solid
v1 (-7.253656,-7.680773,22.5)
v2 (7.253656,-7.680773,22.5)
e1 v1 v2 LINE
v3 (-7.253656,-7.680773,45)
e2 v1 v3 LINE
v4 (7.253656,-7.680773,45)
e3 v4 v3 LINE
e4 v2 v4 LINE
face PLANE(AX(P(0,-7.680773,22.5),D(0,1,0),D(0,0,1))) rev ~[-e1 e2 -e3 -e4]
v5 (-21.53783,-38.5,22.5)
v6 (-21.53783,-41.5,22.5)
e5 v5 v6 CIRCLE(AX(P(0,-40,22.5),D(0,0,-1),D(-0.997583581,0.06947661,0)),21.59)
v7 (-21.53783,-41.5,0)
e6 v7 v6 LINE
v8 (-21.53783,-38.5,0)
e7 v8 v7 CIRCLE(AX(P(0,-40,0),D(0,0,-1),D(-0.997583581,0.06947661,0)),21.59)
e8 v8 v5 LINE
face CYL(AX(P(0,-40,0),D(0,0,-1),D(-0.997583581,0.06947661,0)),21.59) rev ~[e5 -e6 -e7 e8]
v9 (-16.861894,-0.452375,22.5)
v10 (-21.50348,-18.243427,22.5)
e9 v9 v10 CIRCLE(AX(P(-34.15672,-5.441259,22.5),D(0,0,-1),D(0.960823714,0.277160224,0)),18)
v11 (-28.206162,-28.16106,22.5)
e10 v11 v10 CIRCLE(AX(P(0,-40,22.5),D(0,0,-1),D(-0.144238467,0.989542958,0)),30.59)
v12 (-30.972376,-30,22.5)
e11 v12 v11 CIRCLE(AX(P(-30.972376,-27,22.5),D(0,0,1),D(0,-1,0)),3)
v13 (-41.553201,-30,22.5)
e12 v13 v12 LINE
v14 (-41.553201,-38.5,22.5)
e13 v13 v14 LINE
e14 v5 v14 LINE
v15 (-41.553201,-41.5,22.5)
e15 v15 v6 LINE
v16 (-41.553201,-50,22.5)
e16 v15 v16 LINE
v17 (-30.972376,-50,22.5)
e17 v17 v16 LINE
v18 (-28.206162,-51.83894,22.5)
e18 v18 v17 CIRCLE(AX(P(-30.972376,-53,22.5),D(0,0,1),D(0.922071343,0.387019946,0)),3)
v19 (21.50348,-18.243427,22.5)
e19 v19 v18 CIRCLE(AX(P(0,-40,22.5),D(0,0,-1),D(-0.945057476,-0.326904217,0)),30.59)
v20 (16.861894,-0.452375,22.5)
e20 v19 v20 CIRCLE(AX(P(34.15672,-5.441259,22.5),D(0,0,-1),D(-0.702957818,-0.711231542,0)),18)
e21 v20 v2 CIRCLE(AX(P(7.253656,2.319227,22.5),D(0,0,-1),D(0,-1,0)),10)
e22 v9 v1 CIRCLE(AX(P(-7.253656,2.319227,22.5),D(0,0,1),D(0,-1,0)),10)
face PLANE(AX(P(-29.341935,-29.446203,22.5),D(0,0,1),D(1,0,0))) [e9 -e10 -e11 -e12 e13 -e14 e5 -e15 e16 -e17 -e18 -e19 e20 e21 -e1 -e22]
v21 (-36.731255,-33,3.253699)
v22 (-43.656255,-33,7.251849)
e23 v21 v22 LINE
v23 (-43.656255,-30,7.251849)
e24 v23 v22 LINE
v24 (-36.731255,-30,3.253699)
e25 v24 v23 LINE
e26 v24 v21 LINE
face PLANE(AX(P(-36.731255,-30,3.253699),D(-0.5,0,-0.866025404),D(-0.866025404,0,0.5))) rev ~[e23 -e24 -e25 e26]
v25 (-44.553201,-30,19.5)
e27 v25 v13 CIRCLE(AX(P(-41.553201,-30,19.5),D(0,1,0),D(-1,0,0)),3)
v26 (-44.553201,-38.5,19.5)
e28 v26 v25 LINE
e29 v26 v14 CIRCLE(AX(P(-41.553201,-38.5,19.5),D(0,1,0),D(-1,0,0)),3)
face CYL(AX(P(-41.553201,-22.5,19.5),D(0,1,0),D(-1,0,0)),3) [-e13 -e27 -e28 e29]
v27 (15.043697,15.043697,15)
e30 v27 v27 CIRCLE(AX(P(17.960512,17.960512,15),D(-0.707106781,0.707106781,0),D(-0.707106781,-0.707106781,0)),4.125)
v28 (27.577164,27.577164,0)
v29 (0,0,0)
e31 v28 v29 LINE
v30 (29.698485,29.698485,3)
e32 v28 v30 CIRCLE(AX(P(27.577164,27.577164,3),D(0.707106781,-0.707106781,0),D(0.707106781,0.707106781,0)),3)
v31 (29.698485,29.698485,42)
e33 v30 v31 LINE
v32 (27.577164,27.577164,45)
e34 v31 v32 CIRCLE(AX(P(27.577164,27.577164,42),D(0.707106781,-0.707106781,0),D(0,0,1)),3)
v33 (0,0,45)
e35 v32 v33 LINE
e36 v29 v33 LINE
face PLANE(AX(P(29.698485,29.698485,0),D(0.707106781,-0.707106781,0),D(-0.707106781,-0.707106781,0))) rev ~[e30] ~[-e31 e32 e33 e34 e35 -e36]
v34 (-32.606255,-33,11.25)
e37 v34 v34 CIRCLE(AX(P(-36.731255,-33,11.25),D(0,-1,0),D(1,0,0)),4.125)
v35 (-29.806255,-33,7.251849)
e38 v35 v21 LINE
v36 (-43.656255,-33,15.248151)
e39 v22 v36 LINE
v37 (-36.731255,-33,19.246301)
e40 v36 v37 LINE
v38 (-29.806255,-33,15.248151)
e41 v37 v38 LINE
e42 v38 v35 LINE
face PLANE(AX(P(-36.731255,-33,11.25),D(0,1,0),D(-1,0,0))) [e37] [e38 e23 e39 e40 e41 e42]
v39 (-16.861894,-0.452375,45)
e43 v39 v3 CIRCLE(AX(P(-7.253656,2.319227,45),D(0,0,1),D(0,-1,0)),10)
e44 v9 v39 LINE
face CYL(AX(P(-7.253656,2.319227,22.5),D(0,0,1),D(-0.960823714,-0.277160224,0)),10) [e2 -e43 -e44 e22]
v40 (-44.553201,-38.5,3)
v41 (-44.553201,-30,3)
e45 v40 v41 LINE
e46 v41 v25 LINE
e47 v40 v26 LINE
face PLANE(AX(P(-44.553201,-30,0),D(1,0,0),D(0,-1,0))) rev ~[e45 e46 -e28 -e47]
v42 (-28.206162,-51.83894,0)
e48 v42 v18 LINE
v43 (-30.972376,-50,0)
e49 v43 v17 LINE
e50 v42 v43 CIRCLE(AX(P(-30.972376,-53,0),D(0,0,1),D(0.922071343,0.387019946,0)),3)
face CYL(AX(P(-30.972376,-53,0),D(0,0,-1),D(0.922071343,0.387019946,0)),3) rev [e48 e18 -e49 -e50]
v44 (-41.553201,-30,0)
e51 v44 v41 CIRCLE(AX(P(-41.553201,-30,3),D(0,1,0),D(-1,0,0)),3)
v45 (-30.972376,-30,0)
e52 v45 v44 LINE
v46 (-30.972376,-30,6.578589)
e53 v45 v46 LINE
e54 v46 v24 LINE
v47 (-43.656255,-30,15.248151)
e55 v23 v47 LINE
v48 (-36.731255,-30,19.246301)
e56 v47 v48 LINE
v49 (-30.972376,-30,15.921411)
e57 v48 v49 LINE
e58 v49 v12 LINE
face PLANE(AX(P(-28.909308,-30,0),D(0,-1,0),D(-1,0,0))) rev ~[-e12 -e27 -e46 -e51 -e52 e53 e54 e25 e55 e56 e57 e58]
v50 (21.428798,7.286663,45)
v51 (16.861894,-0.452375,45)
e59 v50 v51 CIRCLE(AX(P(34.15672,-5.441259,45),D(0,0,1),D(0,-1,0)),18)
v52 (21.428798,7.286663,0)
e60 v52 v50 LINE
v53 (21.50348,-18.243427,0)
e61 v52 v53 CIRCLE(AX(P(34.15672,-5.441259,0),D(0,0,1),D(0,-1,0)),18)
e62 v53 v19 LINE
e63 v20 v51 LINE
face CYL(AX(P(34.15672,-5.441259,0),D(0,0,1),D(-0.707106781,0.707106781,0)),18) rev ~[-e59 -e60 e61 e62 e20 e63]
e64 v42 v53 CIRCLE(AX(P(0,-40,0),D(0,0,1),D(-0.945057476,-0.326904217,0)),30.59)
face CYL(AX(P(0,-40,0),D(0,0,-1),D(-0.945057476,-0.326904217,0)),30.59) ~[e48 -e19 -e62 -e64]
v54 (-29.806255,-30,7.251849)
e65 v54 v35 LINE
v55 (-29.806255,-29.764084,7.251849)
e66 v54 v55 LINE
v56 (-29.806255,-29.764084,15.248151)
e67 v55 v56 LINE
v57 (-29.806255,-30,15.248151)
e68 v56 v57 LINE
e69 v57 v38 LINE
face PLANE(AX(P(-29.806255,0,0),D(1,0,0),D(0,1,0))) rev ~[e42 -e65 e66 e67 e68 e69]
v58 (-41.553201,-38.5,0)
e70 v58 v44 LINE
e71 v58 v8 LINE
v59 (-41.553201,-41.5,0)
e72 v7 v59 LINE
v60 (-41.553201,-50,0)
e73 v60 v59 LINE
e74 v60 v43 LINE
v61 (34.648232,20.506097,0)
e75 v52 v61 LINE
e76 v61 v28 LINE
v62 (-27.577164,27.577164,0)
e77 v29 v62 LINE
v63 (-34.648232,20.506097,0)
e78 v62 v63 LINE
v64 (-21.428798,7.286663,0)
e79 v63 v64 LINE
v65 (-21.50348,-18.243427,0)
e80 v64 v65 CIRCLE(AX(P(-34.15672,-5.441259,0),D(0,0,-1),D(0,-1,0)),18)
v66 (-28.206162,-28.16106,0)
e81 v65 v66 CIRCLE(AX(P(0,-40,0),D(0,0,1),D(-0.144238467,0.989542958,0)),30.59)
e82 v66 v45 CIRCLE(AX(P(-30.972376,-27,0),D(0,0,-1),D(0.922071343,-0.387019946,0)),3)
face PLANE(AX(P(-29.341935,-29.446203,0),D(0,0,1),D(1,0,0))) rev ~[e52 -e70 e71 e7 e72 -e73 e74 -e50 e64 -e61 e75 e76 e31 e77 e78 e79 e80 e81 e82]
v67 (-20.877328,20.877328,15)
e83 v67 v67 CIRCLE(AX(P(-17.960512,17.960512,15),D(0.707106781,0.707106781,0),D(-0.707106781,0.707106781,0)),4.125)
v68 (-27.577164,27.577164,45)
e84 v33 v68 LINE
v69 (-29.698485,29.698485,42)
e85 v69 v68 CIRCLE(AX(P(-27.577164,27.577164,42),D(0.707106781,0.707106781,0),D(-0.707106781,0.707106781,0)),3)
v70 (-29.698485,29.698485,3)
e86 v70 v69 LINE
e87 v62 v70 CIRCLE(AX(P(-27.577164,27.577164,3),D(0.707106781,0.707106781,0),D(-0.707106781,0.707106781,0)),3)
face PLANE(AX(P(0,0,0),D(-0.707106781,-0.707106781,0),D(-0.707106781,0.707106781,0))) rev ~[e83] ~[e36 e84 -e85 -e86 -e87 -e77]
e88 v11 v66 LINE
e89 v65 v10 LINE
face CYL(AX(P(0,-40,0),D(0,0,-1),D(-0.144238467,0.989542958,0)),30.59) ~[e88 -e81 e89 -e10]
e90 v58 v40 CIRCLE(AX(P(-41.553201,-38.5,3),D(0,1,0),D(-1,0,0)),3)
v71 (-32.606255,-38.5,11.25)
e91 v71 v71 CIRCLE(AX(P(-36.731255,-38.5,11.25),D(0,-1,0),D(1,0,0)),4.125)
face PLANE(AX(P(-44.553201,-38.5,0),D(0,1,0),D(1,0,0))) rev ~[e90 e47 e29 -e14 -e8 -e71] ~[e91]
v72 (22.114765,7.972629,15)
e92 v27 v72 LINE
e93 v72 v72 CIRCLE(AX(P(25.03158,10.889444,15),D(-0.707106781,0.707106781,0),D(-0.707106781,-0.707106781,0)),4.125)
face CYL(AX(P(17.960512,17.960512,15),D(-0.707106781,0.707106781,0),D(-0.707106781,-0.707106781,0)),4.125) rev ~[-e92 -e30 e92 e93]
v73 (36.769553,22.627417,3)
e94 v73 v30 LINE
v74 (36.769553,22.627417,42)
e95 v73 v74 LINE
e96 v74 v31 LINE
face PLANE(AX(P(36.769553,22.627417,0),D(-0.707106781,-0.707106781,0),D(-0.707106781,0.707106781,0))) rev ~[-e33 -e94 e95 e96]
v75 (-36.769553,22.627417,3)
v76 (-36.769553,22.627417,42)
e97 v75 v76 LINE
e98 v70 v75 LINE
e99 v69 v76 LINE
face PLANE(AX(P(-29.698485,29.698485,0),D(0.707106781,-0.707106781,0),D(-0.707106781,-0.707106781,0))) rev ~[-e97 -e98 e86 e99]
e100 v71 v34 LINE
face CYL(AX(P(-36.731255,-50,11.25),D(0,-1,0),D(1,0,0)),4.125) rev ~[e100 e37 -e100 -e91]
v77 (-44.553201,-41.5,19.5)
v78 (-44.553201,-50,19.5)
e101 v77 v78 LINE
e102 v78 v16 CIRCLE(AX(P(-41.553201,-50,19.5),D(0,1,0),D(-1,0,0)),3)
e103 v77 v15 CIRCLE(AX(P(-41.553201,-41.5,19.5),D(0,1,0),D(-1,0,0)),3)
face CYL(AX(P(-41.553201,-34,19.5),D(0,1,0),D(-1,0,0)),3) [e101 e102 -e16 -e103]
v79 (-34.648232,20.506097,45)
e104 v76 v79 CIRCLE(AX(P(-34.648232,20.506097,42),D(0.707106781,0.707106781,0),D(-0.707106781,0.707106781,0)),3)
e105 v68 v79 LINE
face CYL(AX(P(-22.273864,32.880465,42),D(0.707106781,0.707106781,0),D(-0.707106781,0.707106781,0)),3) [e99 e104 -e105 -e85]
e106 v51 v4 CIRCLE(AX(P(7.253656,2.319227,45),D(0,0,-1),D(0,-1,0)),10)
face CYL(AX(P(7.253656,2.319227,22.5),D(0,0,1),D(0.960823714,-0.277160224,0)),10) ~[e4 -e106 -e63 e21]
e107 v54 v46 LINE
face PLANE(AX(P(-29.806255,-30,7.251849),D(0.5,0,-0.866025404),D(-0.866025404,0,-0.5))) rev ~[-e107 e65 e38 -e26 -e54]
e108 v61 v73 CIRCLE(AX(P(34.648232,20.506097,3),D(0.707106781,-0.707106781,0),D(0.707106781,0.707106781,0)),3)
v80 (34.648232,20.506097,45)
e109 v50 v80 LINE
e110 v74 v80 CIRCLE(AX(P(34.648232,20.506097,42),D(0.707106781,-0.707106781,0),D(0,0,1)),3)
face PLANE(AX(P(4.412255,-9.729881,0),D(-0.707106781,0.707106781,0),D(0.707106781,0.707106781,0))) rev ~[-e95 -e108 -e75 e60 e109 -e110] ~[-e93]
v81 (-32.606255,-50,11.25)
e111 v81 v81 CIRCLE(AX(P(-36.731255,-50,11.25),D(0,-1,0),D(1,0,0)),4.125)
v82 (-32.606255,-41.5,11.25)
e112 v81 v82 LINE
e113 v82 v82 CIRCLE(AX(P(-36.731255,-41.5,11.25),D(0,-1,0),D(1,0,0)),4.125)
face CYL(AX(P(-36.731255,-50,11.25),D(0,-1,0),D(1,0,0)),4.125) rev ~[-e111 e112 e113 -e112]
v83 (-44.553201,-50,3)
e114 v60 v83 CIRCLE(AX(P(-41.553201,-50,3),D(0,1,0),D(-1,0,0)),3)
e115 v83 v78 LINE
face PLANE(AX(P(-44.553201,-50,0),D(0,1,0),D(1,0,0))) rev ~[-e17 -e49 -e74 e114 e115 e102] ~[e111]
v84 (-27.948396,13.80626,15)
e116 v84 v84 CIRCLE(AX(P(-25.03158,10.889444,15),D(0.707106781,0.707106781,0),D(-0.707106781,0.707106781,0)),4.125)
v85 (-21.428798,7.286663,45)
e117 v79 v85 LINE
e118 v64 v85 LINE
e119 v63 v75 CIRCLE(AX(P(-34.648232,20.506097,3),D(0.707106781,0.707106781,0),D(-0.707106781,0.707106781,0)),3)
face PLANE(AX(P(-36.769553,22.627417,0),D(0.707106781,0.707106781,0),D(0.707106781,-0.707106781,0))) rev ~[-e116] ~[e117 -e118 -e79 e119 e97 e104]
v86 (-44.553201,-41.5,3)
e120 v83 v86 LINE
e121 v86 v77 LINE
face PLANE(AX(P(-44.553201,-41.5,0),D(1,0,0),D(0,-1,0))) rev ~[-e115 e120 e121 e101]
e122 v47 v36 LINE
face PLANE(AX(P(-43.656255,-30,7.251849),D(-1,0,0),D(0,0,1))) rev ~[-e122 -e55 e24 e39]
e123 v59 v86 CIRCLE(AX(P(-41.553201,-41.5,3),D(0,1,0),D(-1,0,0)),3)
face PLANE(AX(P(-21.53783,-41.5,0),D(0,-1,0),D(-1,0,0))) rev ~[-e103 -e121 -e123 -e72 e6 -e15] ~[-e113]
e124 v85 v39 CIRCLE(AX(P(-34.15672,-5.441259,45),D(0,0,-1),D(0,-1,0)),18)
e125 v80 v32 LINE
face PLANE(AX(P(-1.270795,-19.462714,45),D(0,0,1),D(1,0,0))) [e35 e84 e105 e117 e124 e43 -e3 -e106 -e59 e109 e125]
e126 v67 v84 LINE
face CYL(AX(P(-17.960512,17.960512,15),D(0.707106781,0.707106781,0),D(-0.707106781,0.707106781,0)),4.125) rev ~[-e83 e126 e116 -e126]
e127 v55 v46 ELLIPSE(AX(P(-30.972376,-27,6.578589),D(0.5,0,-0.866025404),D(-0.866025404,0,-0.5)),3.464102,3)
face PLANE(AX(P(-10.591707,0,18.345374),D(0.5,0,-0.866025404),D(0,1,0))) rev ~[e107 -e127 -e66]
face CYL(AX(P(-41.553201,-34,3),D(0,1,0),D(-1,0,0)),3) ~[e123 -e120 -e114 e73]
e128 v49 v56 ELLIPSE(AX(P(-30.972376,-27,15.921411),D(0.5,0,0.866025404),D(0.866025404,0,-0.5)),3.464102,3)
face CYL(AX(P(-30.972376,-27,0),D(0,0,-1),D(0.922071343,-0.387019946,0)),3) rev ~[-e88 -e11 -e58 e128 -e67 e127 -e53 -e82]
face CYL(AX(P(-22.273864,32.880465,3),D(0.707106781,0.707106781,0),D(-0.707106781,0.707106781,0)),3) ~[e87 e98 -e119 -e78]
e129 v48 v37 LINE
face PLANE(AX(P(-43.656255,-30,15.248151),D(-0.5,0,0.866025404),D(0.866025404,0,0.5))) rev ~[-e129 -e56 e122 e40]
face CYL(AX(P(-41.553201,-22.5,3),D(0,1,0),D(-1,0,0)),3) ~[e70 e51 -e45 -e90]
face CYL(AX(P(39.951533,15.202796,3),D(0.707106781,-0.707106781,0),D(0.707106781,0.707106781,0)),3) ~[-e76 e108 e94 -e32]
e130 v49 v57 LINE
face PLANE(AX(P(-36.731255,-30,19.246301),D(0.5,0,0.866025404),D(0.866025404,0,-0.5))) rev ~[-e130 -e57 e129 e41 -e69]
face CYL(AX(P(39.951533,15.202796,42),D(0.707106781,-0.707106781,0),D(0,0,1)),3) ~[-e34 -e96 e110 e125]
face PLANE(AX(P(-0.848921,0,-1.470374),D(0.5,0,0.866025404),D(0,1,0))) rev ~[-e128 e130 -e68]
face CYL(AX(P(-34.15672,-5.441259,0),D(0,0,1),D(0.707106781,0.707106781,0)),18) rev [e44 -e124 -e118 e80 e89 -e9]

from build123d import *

# Parameters (mm, degrees)
F1_DEPTH      = 45
F2_R          = 4.125
F3_DEPTH      = 10
F4_R          = 4.125
F5_DEPTH      = 10
F6_R          = 4.125
F7_DEPTH      = 20
F9_DEPTH      = 3
F10_R         = 18
F11_W         = 72.4435358676
F11_H         = 36.0539390085
F12_DEPTH     = 100
F13_T1_DEPTH  = 22.5
F13_T6_DEPTH  = 22.5
F13_T12_DEPTH = 22.5
F13_T18_DEPTH = 22.5
F13_T25_DEPTH = 22.5
F13_T31_DEPTH = 22.5
F13_T34_DEPTH = 23.5
F13_T36_DEPTH = 23.5
F13_T38_DEPTH = 25
F13_T40_DEPTH = 25
F14_R         = 10


# Not quite as in the source:
# - a fillet or chamfer that OpenCascade refuses, or shapes differently, is made with other operations: its cross-section is extruded or revolved along the edge and cut away or added


with BuildPart() as f1:
    # F0 (on Top) → F1 (new body)
    with BuildSketch(Plane.XY):
        with BuildLine():
            Line((29.6984848098, 29.6984848098), (0, 0))
            Line((0, 0), (-29.6984848098, 29.6984848098))
            Line((-29.6984848098, 29.6984848098), (-36.7695526217, 22.627416998))
            Line((-36.7695526217, 22.627416998), (-4.4122546938, -9.7298809299))
            ThreePointArc((-4.4122546938, -9.7298809299), (-19.5013094439, -16.4320762481), (-28.9093081896, -30))
            ThreePointArc((-28.9093081896, -30), (-30.0334813831, -34.1915496034), (-30.5532011416, -38.5))
            Line((-30.5532011416, -38.5), (-21.53782951, -38.5))
            ThreePointArc((-21.53782951, -38.5), (21.59, -40), (-21.53782951, -41.5))
            Line((-21.53782951, -41.5), (-30.5532011416, -41.5))
            ThreePointArc((-30.5532011416, -41.5), (-30.0334813831, -45.8084503966), (-28.9093081896, -50))
            ThreePointArc((-28.9093081896, -50), (23.5679237519, -59.5013094439), (4.4122546938, -9.7298809299))
            Line((4.4122546938, -9.7298809299), (36.7695526217, 22.627416998))
            Line((36.7695526217, 22.627416998), (29.6984848098, 29.6984848098))
        make_face()
        with BuildLine():
            ThreePointArc((-30.5532011416, -38.5), (-30.0334813831, -34.1915496034), (-28.9093081896, -30))
            Line((-28.9093081896, -30), (-44.5532011416, -30))
            Line((-44.5532011416, -30), (-44.5532011416, -38.5))
            Line((-44.5532011416, -38.5), (-30.5532011416, -38.5))
        make_face()
        with BuildLine():
            Line((-44.5532011416, -50), (-28.9093081896, -50))
            ThreePointArc((-28.9093081896, -50), (-30.0334813831, -45.8084503966), (-30.5532011416, -41.5))
            Line((-30.5532011416, -41.5), (-44.5532011416, -41.5))
            Line((-44.5532011416, -41.5), (-44.5532011416, -50))
        make_face()
    extrude(amount=F1_DEPTH)

    # F2 (on face) → F3 (cut, through all)
    with BuildSketch(Plane(origin=(0, 0, 0), x_dir=(-0.7071067812, -0.7071067812, 0), z_dir=(-0.7071067812, 0.7071067812, 0))):
        with Locations((-25.4, 15)):
            Circle(F2_R)
    extrude(amount=-F3_DEPTH, mode=Mode.SUBTRACT)

    # F4 (on face) → F5 (cut, through all)
    with BuildSketch(Plane(origin=(0, 0, 0), x_dir=(-0.7071067812, 0.7071067812, 0), z_dir=(0.7071067812, 0.7071067812, 0))):
        with Locations((25.4, 15)):
            Circle(F4_R)
    extrude(amount=-F5_DEPTH, mode=Mode.SUBTRACT)

    # F6 (on face) → F7 (cut, through all)
    with BuildSketch(Plane.XZ.offset(50)):
        with Locations((-36.7312546656, 33.75)):
            Circle(F6_R)
        with Locations((-36.7312546656, 11.25)):
            Circle(F6_R)
    extrude(amount=-F7_DEPTH, mode=Mode.SUBTRACT)

    # F8 (on face) → F9 (cut)
    with BuildSketch(Plane(origin=(0, -30, 0), x_dir=(-1, 0, 0), z_dir=(0, 1, 0))):
        Polygon((43.6562546656, 37.7481506141), (36.7312546656, 41.7463012283), (29.8062546656, 37.7481506141), (29.8062546656, 29.7518493859), (36.7312546656, 25.7536987717), (43.6562546656, 29.7518493859), align=None)
        Polygon((43.6562546656, 7.2518493859), (43.6562546656, 15.2481506141), (36.7312546656, 19.2463012283), (29.8062546656, 15.2481506141), (29.8062546656, 7.2518493859), (36.7312546656, 3.2536987717), align=None)
    extrude(amount=-F9_DEPTH, mode=Mode.SUBTRACT)

    # F10
    f10_edges = [f1.edges().sort_by_distance(p)[0] for p in [
        (-4.412255, -9.729881, 22.5),
        (4.412255, -9.729881, 22.5),
    ]]
    fillet(f10_edges, radius=F10_R)

    # F11 (on Right) → F12 (cut, symmetric)
    with BuildSketch(Plane.YZ):
        with Locations((-43.9025410381, 40.5269695042)):
            Rectangle(F11_W, F11_H)
    extrude(amount=F12_DEPTH, both=True, mode=Mode.SUBTRACT)

    # F13: fillet of radius 3 on 10 edges, made by hand

    # F13_s2 → F13_t1 (join)
    with BuildSketch(Plane.XY):
        with BuildLine():
            ThreePointArc((-28.206162374, -51.8389401608), (-29.3115301597, -50.5016826145), (-30.9723764022, -50))
            Line((-30.9723764022, -50), (-28.9093081896, -50))
            ThreePointArc((-28.9093081896, -50), (-28.5725334833, -50.9251283904), (-28.206162374, -51.8389401608))
        make_face()
    extrude(amount=F13_T1_DEPTH)


with BuildPart() as f13_tool4:
    # F13_s5 → F13_t6 (new body)
    with BuildSketch(Plane.XY):
        with BuildLine():
            ThreePointArc((-28.206162374, -28.1610598392), (-29.3115301597, -29.4983173855), (-30.9723764022, -30))
            Line((-30.9723764022, -30), (-28.9093081896, -30))
            ThreePointArc((-28.9093081896, -30), (-28.5725334833, -29.0748716096), (-28.206162374, -28.1610598392))
        make_face()
    extrude(amount=F13_T6_DEPTH)

    split(bisect_by=Plane(origin=(-10.5917065627, 0, 18.3453739054), x_dir=(0, 1, 0), z_dir=(0.5, 0, -0.8660254038)), keep=Keep.TOP)

    split(bisect_by=Plane.YZ.offset(-29.8062546656), keep=Keep.TOP)


with BuildPart() as f1_1:
    add(f1.part)

    # F13_t3: union F13_tool4
    add(f13_tool4.part)


with BuildPart() as f13_tool10:
    # F13_s11 → F13_t12 (new body)
    with BuildSketch(Plane.XY):
        with BuildLine():
            ThreePointArc((-28.206162374, -28.1610598392), (-29.3115301597, -29.4983173855), (-30.9723764022, -30))
            Line((-30.9723764022, -30), (-28.9093081896, -30))
            ThreePointArc((-28.9093081896, -30), (-28.5725334833, -29.0748716096), (-28.206162374, -28.1610598392))
        make_face()
    extrude(amount=F13_T12_DEPTH)

    split(bisect_by=Plane(origin=(-10.5917065627, 0, 18.3453739054), x_dir=(0, 1, 0), z_dir=(0.5, 0, -0.8660254038)), keep=Keep.TOP)

    split(bisect_by=Plane.YZ.offset(-29.8062546656), keep=Keep.BOTTOM)


with BuildPart() as f1_2:
    add(f1_1.part)

    # F13_t9: union F13_tool10
    add(f13_tool10.part)


with BuildPart() as f13_tool16:
    # F13_s17 → F13_t18 (new body)
    with BuildSketch(Plane.XY):
        with BuildLine():
            ThreePointArc((-28.206162374, -28.1610598392), (-29.3115301597, -29.4983173855), (-30.9723764022, -30))
            Line((-30.9723764022, -30), (-28.9093081896, -30))
            ThreePointArc((-28.9093081896, -30), (-28.5725334833, -29.0748716096), (-28.206162374, -28.1610598392))
        make_face()
    extrude(amount=F13_T18_DEPTH)

    split(bisect_by=Plane(origin=(-10.5917065627, 0, 18.3453739054), x_dir=(0, 1, 0), z_dir=(-0.5, 0, 0.8660254038)), keep=Keep.TOP)

    split(bisect_by=Plane.YZ.offset(-29.8062546656), keep=Keep.TOP)

    split(bisect_by=Plane(origin=(-0.8489207701, 0, -1.4703739054), x_dir=(0, 1, 0), z_dir=(-0.5, 0, -0.8660254038)), keep=Keep.TOP)


with BuildPart() as f1_3:
    add(f1_2.part)

    # F13_t15: union F13_tool16
    add(f13_tool16.part)


with BuildPart() as f13_tool23:
    # F13_s24 → F13_t25 (new body)
    with BuildSketch(Plane.XY):
        with BuildLine():
            ThreePointArc((-28.206162374, -28.1610598392), (-29.3115301597, -29.4983173855), (-30.9723764022, -30))
            Line((-30.9723764022, -30), (-28.9093081896, -30))
            ThreePointArc((-28.9093081896, -30), (-28.5725334833, -29.0748716096), (-28.206162374, -28.1610598392))
        make_face()
    extrude(amount=F13_T25_DEPTH)

    split(bisect_by=Plane.YZ.offset(-29.8062546656), keep=Keep.TOP)

    split(bisect_by=Plane(origin=(-0.8489207701, 0, -1.4703739054), x_dir=(0, 1, 0), z_dir=(0.5, 0, 0.8660254038)), keep=Keep.TOP)


with BuildPart() as f1_4:
    add(f1_3.part)

    # F13_t22: union F13_tool23
    add(f13_tool23.part)


with BuildPart() as f13_tool29:
    # F13_s30 → F13_t31 (new body)
    with BuildSketch(Plane.XY):
        with BuildLine():
            ThreePointArc((-28.206162374, -28.1610598392), (-29.3115301597, -29.4983173855), (-30.9723764022, -30))
            Line((-30.9723764022, -30), (-28.9093081896, -30))
            ThreePointArc((-28.9093081896, -30), (-28.5725334833, -29.0748716096), (-28.206162374, -28.1610598392))
        make_face()
    extrude(amount=F13_T31_DEPTH)

    split(bisect_by=Plane.YZ.offset(-29.8062546656), keep=Keep.BOTTOM)

    split(bisect_by=Plane(origin=(-0.8489207701, 0, -1.4703739054), x_dir=(0, 1, 0), z_dir=(0.5, 0, 0.8660254038)), keep=Keep.TOP)


with BuildPart() as f1_5:
    add(f1_4.part)

    # F13_t28: union F13_tool29
    add(f13_tool29.part)

    # F13_s35 → F13_t34 (cut)
    with BuildSketch(Plane.XZ.offset(34)):
        with BuildLine():
            ThreePointArc((-44.5532011416, 3), (-43.6745214852, 0.8786796564), (-41.5532011416, 0))
            Line((-41.5532011416, 0), (-44.5532011416, 0))
            Line((-44.5532011416, 0), (-44.5532011416, 3))
        make_face()
        with BuildLine():
            ThreePointArc((-44.5532011416, 19.5), (-43.6745214852, 21.6213203436), (-41.5532011416, 22.5))
            Line((-41.5532011416, 22.5), (-44.5532011416, 22.5))
            Line((-44.5532011416, 22.5), (-44.5532011416, 19.5))
        make_face()
    extrude(amount=F13_T34_DEPTH, mode=Mode.SUBTRACT)

    # F13_s37 → F13_t36 (cut)
    with BuildSketch(Plane.XZ.offset(22.5)):
        with BuildLine():
            ThreePointArc((-44.5532011416, 3), (-43.6745214852, 0.8786796564), (-41.5532011416, 0))
            Line((-41.5532011416, 0), (-44.5532011416, 0))
            Line((-44.5532011416, 0), (-44.5532011416, 3))
        make_face()
        with BuildLine():
            ThreePointArc((-44.5532011416, 19.5), (-43.6745214852, 21.6213203436), (-41.5532011416, 22.5))
            Line((-41.5532011416, 22.5), (-44.5532011416, 22.5))
            Line((-44.5532011416, 22.5), (-44.5532011416, 19.5))
        make_face()
    extrude(amount=F13_T36_DEPTH, mode=Mode.SUBTRACT)

    # F13_s39 → F13_t38 (cut)
    with BuildSketch(Plane(origin=(5.3033008589, 5.3033008589, 0), x_dir=(0, 0, 1), z_dir=(-0.7071067812, -0.7071067812, 0))):
        with BuildLine():
            ThreePointArc((42, 42), (44.1213203436, 41.1213203436), (45, 39))
            Line((45, 39), (45, 42))
            Line((45, 42), (42, 42))
        make_face()
        with BuildLine():
            ThreePointArc((3, 42), (0.8786796564, 41.1213203436), (0, 39))
            Line((0, 39), (0, 42))
            Line((0, 42), (3, 42))
        make_face()
    extrude(amount=F13_T38_DEPTH, mode=Mode.SUBTRACT)

    # F13_s41 → F13_t40 (cut)
    with BuildSketch(Plane(origin=(12.3743686708, -12.3743686708, 0), x_dir=(0, 0, 1), z_dir=(-0.7071067812, 0.7071067812, 0))):
        with BuildLine():
            ThreePointArc((45, 39), (44.1213203436, 41.1213203436), (42, 42))
            Line((42, 42), (45, 42))
            Line((45, 42), (45, 39))
        make_face()
        with BuildLine():
            ThreePointArc((3, 42), (0.8786796564, 41.1213203436), (0, 39))
            Line((0, 39), (0, 42))
            Line((0, 42), (3, 42))
        make_face()
    extrude(amount=F13_T40_DEPTH, mode=Mode.SUBTRACT)

    # F14
    f14_edges = [f1_5.edges().sort_by_distance(p)[0] for p in [
        (-16.296581, -7.680773, 33.75),
        (16.296581, -7.680773, 33.75),
    ]]
    fillet(f14_edges, radius=F14_R)


solid = f1_5.part
